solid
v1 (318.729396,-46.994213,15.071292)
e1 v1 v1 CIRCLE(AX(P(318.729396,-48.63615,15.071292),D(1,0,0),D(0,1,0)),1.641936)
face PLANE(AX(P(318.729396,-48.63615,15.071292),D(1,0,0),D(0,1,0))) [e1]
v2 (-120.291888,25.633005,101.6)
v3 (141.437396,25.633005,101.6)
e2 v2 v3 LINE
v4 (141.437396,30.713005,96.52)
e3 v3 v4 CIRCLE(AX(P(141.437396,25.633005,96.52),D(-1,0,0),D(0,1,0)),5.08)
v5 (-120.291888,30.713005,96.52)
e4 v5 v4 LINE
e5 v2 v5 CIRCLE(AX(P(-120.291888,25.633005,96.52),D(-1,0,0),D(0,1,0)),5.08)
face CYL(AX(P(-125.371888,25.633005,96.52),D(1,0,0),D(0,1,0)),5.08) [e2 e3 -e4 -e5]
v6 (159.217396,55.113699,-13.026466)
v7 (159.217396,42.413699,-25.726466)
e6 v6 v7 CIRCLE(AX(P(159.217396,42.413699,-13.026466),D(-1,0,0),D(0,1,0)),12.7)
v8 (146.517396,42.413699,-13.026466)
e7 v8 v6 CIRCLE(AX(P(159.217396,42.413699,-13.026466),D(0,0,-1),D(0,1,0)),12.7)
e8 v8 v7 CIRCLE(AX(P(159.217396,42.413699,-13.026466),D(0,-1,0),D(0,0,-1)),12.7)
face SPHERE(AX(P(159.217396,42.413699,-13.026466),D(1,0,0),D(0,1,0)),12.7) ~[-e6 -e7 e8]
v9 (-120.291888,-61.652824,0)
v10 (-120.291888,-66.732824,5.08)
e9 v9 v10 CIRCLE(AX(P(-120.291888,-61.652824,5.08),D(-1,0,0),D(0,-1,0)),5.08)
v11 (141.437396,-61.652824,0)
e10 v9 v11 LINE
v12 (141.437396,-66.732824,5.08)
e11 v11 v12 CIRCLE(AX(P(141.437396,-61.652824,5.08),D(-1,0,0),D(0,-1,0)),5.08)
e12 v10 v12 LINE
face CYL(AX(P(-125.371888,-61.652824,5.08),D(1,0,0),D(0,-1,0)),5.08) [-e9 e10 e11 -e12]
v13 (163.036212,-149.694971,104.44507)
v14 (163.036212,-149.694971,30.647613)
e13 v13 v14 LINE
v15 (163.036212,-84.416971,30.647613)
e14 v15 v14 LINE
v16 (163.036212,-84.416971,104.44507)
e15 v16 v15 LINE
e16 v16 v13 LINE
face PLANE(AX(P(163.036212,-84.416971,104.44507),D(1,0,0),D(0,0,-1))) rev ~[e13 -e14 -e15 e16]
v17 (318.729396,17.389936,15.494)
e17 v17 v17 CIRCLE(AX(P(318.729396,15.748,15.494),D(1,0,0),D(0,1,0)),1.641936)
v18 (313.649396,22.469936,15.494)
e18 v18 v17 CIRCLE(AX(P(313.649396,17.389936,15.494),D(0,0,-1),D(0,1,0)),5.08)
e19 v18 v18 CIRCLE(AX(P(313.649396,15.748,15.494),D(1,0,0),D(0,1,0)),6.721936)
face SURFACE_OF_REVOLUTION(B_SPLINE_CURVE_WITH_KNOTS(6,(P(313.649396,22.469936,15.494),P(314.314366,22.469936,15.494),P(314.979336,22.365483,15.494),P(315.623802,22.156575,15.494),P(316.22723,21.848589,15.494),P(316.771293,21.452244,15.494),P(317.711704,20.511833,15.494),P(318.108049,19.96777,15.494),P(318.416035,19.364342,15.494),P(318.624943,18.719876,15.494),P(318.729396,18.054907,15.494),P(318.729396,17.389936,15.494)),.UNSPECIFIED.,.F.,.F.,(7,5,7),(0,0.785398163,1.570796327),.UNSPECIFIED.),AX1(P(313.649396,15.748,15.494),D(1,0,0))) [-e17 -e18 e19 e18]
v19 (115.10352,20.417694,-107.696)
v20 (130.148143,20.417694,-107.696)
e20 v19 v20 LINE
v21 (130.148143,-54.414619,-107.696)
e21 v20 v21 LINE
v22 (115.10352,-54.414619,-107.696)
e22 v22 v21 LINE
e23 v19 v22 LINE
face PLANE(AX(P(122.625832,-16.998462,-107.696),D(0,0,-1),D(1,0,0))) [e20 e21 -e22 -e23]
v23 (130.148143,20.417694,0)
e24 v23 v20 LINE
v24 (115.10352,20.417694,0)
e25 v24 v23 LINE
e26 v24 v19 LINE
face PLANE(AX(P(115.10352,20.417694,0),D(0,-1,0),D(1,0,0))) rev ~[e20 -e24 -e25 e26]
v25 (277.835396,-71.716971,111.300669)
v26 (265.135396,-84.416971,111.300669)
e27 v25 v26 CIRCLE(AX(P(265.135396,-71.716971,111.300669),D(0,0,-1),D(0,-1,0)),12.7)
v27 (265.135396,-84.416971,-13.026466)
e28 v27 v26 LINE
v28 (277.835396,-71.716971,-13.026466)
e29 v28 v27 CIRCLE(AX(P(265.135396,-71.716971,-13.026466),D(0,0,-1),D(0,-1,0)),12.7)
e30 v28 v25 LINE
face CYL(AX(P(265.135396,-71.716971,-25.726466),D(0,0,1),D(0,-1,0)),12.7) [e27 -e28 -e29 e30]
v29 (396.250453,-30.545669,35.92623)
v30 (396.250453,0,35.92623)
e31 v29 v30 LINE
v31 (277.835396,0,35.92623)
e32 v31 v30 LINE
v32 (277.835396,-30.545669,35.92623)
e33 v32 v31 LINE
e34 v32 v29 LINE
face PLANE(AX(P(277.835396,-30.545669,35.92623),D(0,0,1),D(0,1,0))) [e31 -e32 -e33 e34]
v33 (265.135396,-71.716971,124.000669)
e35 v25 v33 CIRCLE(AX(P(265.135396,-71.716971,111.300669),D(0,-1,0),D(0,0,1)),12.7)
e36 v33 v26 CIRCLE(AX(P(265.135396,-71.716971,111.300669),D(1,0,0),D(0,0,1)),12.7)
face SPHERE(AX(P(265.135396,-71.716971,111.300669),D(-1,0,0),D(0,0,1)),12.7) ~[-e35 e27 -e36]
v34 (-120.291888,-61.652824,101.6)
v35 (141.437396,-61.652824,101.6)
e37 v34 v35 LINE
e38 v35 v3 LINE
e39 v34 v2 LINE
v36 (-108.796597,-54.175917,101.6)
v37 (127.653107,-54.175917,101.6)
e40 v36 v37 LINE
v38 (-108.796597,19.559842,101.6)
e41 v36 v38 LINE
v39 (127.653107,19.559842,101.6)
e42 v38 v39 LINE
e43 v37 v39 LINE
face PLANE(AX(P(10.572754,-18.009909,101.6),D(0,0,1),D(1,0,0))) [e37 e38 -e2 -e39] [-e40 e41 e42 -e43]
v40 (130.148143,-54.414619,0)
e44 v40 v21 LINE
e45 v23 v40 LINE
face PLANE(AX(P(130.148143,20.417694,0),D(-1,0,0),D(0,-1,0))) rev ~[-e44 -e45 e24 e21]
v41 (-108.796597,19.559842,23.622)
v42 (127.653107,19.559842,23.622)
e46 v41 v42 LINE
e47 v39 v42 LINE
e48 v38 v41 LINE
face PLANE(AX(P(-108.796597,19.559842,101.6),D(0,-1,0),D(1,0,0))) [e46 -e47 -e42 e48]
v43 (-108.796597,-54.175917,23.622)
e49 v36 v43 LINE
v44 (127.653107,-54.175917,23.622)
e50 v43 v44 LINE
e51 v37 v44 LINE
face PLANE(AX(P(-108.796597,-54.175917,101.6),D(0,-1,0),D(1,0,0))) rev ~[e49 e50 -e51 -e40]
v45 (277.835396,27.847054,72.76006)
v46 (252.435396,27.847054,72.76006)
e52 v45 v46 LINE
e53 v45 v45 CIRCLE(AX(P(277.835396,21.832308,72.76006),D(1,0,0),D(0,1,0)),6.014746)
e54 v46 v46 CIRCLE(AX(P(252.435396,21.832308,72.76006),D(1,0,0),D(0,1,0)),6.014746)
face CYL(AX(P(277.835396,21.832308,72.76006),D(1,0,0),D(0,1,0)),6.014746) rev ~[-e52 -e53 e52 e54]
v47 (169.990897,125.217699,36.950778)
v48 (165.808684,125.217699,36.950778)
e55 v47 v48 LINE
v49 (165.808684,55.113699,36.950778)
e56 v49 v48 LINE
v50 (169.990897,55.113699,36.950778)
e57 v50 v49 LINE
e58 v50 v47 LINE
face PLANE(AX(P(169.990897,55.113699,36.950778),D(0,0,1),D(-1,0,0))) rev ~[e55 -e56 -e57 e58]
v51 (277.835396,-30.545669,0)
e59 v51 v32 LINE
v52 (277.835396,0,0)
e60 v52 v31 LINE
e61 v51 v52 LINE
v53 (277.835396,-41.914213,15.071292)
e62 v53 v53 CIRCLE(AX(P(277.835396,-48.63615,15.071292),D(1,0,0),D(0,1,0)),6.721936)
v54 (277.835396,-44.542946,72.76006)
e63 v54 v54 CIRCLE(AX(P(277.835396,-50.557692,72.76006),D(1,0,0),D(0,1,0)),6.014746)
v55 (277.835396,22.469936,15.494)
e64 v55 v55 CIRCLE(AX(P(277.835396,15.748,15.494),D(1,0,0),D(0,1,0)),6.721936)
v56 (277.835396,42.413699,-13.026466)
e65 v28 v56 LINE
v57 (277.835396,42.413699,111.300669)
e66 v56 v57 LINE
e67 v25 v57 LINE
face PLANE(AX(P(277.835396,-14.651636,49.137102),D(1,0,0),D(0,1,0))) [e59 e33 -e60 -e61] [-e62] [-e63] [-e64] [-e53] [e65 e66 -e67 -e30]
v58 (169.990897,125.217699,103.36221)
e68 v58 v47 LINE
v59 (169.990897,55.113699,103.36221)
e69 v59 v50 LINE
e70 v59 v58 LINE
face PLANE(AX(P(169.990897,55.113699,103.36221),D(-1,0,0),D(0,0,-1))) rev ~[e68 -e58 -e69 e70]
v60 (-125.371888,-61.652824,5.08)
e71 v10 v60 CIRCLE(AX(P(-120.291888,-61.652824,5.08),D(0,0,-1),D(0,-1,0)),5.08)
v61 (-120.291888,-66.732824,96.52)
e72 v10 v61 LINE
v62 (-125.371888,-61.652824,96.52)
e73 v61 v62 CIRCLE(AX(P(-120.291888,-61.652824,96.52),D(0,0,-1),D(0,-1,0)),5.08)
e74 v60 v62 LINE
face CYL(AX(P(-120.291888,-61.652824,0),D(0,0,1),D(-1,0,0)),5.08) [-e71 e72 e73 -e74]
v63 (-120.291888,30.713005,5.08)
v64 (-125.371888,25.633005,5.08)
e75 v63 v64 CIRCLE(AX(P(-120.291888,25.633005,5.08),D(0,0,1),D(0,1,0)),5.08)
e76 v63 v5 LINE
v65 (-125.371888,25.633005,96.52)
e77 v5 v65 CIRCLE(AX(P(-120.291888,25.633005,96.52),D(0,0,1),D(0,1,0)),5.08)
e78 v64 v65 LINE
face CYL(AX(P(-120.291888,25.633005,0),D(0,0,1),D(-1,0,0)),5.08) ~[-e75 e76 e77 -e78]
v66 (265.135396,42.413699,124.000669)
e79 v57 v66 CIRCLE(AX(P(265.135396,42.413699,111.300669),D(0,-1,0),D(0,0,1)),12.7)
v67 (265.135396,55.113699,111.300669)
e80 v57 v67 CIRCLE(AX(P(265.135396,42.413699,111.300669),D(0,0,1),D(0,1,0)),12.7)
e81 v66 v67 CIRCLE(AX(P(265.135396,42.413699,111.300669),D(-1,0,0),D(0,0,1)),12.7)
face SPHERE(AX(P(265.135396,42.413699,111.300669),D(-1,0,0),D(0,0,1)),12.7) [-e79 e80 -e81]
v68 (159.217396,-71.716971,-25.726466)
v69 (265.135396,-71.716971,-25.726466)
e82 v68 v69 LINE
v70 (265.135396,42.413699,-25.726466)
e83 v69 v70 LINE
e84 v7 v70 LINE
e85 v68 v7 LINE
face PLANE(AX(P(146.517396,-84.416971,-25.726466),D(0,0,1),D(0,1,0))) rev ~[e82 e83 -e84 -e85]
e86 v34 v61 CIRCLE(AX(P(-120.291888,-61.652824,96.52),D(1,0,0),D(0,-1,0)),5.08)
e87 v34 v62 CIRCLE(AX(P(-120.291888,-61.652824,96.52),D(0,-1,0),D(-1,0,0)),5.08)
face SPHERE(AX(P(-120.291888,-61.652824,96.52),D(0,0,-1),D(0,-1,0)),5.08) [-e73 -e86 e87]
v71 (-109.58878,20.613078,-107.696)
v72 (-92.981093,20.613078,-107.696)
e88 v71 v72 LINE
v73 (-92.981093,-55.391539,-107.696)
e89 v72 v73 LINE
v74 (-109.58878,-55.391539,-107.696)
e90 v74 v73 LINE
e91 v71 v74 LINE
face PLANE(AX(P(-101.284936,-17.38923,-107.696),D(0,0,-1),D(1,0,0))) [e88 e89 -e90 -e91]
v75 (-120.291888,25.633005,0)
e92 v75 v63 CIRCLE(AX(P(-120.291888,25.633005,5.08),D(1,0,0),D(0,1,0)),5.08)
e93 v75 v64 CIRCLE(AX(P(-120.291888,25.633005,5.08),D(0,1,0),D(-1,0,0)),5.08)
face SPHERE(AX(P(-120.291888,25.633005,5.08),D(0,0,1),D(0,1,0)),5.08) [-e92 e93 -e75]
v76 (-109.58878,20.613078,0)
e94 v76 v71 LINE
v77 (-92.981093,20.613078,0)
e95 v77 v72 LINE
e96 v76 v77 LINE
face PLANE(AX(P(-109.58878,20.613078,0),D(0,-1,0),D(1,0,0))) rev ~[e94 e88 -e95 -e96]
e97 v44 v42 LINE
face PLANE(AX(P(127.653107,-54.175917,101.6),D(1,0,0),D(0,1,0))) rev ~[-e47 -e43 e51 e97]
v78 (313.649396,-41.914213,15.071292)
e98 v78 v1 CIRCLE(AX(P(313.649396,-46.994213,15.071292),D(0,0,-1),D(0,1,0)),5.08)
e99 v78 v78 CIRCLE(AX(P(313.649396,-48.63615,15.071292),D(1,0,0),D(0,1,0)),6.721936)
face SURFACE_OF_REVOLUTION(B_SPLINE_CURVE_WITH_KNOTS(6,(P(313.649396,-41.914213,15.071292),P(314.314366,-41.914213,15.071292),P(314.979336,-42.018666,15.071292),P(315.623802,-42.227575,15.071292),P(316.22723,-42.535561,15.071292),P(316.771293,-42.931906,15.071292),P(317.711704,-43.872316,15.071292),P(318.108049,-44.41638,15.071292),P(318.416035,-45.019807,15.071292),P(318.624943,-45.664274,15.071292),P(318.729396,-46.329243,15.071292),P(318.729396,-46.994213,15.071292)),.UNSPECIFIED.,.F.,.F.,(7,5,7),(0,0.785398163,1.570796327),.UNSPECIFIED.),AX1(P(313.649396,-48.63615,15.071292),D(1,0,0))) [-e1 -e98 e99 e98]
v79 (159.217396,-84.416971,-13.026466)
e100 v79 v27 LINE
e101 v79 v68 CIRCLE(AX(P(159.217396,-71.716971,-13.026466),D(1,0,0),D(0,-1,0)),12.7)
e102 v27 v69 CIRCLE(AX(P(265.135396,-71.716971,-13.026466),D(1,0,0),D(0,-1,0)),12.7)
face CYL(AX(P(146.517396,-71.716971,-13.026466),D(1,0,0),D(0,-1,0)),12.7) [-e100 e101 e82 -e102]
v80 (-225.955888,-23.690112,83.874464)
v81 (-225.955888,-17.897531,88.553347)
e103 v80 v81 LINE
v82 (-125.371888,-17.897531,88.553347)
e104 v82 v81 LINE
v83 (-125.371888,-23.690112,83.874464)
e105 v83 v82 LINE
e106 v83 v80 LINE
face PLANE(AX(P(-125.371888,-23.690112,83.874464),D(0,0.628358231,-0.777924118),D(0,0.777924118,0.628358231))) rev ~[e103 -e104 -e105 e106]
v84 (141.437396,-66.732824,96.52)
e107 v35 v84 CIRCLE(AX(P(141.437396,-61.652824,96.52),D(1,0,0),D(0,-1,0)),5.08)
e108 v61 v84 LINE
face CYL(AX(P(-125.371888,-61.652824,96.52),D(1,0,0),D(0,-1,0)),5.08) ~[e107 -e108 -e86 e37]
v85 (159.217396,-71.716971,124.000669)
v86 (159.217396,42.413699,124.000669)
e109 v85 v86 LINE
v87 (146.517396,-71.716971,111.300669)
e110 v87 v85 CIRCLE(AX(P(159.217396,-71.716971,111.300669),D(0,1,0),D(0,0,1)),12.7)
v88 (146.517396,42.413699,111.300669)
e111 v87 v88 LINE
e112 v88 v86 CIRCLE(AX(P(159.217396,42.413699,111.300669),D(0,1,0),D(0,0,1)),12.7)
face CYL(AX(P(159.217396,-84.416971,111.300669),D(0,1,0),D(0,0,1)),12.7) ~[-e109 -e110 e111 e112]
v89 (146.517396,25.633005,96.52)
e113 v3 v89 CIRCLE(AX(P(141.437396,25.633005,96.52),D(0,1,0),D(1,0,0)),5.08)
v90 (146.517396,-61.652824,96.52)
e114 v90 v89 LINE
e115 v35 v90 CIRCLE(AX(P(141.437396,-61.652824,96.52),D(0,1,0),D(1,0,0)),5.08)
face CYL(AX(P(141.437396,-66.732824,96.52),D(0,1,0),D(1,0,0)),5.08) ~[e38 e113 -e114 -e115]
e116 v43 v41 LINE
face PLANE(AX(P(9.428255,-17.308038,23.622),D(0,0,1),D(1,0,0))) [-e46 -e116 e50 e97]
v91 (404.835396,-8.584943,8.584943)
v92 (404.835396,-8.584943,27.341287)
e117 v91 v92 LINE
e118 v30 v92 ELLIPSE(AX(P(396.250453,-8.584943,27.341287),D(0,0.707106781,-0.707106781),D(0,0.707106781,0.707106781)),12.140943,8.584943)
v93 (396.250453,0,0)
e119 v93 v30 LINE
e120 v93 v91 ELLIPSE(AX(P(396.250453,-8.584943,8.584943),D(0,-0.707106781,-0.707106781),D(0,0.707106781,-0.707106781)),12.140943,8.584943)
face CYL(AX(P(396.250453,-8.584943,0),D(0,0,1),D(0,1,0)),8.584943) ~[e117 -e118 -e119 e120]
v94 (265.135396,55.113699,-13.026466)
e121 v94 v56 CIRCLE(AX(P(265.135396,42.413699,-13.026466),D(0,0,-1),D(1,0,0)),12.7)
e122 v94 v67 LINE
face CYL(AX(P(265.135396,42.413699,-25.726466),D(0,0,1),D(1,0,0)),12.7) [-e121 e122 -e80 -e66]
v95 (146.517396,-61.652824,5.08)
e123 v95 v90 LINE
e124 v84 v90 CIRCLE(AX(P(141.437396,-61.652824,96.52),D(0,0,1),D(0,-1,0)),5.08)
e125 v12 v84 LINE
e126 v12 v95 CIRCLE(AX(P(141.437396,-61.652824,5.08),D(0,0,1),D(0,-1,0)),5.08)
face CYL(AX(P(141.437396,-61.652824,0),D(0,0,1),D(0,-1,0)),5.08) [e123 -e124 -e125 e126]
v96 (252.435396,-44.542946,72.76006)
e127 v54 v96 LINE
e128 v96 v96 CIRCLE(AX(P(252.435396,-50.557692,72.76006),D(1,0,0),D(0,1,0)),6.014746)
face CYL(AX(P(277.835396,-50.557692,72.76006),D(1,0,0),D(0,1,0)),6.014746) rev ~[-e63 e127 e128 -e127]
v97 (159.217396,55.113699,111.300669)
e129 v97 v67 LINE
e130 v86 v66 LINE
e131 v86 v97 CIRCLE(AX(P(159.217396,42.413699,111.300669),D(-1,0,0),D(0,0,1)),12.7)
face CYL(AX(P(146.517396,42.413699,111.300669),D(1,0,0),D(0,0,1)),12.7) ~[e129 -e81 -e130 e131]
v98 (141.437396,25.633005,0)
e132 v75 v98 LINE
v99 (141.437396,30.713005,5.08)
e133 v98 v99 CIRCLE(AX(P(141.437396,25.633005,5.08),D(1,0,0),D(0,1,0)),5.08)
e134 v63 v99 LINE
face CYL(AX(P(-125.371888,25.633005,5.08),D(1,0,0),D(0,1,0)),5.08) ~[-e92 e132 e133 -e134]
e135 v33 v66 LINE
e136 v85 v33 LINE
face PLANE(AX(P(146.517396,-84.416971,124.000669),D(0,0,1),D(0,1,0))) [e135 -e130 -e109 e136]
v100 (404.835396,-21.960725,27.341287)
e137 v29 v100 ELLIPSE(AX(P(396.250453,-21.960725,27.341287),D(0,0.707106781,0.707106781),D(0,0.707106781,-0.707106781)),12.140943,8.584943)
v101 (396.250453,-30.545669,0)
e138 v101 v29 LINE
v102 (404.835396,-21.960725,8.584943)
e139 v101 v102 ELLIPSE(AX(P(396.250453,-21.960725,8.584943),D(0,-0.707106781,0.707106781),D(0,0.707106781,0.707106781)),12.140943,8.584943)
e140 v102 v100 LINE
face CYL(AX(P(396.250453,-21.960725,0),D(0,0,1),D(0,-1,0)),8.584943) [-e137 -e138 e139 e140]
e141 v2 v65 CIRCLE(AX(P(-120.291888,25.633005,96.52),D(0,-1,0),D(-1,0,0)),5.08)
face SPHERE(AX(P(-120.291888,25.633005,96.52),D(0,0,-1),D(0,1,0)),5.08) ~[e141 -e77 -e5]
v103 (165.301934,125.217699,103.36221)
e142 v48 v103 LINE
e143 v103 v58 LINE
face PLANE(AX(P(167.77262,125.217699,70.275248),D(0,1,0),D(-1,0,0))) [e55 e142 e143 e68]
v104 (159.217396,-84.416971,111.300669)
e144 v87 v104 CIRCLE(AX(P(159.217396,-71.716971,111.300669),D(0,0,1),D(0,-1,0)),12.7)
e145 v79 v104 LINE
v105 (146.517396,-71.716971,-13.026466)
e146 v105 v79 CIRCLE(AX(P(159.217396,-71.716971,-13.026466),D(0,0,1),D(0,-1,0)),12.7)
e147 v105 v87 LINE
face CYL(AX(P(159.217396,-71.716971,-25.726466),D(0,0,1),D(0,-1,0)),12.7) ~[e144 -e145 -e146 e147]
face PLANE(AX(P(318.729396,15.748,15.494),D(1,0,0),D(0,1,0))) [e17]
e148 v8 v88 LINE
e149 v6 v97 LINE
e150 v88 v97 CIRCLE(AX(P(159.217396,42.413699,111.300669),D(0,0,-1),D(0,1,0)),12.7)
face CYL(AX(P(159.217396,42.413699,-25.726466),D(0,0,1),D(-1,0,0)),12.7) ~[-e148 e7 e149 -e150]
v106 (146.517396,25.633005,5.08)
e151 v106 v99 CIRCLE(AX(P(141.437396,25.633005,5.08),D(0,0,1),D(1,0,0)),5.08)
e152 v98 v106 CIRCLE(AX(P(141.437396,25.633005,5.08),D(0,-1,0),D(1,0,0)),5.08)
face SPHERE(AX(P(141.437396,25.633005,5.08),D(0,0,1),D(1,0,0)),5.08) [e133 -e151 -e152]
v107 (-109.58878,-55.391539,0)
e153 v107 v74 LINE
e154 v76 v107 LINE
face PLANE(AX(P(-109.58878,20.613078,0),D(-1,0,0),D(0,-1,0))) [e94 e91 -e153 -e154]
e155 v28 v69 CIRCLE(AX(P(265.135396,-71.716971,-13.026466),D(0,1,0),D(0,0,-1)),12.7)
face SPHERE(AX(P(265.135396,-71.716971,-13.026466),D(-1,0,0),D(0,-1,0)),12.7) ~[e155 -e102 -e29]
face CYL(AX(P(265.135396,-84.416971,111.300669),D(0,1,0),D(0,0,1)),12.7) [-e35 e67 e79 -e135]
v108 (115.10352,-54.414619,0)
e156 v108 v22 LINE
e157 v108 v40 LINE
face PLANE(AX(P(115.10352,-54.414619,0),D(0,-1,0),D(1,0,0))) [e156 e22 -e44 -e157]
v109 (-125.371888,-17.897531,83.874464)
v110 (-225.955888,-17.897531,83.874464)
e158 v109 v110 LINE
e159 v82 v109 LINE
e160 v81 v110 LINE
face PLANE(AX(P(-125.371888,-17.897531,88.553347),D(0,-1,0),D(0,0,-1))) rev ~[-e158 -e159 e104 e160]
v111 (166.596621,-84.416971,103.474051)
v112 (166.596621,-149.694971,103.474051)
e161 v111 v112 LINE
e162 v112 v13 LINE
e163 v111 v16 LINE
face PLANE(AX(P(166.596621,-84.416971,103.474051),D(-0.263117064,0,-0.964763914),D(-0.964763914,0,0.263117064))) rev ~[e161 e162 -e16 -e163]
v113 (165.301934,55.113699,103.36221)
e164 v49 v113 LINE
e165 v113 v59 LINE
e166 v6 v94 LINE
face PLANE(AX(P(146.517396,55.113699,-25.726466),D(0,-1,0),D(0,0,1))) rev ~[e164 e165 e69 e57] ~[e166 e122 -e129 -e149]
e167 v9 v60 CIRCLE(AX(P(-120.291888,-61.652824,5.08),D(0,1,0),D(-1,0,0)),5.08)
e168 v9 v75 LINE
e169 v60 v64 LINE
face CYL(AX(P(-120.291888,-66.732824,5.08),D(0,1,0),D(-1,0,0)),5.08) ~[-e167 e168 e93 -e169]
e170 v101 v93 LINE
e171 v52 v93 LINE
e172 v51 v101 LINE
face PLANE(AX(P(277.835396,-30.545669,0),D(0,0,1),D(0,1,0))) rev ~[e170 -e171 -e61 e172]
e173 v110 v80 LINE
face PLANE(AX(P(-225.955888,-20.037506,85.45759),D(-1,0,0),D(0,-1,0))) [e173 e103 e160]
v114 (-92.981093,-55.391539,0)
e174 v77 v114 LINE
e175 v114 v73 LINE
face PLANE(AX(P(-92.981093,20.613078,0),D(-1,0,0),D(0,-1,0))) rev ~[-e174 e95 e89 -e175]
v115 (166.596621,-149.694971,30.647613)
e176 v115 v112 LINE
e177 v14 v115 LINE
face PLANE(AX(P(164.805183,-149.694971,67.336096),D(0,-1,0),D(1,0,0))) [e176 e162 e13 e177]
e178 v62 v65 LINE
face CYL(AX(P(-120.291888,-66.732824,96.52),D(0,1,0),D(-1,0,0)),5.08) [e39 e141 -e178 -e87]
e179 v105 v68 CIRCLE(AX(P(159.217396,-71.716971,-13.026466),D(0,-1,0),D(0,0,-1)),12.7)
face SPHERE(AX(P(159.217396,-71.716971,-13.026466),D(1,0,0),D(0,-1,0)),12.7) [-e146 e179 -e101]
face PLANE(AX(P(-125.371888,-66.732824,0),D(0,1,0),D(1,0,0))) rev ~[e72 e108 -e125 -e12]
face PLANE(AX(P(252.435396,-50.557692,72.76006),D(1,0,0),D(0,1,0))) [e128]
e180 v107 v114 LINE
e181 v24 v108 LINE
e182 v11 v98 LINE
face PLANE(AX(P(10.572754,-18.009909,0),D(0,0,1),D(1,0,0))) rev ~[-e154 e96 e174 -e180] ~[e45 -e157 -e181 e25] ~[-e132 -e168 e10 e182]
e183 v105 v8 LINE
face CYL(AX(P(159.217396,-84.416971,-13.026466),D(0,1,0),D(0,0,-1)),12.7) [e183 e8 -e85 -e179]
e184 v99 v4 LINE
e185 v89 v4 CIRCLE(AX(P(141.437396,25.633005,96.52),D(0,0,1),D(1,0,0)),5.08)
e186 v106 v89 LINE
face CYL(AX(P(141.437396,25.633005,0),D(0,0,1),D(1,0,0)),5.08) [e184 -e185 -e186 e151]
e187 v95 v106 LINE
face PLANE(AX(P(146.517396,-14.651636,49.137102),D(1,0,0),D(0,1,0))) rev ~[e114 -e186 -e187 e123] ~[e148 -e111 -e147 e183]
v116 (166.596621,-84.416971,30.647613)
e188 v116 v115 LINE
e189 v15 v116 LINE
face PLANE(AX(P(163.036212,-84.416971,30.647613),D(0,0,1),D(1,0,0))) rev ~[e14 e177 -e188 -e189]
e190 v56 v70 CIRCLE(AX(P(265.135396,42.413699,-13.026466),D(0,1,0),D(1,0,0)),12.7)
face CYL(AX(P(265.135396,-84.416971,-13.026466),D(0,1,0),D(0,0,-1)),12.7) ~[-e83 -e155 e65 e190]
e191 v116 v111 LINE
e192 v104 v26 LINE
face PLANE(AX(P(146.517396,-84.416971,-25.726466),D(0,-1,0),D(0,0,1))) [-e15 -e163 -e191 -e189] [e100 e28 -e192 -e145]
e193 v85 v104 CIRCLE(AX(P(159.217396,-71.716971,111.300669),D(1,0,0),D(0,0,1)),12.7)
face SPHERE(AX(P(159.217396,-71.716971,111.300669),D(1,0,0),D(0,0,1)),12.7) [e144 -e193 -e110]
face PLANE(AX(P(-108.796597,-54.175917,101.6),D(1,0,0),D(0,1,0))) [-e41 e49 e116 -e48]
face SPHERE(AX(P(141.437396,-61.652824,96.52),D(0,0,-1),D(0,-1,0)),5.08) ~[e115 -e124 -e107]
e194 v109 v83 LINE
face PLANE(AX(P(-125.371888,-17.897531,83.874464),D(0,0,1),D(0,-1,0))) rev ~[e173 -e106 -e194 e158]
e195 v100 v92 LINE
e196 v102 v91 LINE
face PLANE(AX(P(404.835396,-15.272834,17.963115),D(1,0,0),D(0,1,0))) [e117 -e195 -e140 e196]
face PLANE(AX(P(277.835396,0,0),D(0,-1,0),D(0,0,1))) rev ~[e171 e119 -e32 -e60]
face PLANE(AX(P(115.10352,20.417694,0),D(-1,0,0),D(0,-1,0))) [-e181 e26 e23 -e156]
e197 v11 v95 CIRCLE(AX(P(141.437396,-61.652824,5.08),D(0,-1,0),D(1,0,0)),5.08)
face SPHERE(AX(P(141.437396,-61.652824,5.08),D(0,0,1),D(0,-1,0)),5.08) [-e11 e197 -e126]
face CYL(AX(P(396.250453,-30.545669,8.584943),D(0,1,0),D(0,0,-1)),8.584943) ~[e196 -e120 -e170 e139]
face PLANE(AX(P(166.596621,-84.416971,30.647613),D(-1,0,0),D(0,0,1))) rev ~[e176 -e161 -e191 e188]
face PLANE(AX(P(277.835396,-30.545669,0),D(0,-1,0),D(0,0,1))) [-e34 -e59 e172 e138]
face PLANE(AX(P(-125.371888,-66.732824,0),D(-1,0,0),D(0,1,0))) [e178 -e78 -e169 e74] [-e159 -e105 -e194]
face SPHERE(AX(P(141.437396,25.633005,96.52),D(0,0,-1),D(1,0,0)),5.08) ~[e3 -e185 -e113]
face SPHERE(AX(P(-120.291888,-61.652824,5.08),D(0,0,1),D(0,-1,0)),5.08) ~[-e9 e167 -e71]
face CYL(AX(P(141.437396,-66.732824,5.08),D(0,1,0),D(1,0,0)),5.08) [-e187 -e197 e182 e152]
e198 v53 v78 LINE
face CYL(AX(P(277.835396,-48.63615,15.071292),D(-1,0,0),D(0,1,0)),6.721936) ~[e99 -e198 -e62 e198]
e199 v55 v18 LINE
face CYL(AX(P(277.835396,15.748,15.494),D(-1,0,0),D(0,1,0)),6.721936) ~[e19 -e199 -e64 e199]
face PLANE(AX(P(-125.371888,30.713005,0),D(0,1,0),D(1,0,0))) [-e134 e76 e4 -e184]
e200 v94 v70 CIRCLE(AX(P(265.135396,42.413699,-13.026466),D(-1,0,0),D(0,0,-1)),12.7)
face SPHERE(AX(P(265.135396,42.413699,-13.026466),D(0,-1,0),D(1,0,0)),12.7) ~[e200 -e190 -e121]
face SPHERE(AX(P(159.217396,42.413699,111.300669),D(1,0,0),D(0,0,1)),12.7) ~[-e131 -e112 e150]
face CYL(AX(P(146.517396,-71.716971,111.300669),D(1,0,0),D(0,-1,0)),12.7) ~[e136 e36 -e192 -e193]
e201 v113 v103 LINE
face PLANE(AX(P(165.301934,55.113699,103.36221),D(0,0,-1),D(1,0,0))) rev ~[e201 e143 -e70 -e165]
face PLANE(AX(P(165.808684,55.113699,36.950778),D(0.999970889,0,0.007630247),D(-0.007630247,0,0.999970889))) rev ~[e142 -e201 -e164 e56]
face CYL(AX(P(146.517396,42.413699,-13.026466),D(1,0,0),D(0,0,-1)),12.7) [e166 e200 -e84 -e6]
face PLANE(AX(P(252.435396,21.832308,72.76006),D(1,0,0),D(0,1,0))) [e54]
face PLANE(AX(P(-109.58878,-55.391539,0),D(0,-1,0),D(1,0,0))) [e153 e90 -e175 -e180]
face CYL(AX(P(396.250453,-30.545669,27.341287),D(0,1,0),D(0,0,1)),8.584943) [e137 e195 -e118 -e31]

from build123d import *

# Parameters (mm, degrees)
F0_W      = 271.8892842531
F0_H      = 97.4458288401
F1_DEPTH  = 101.6
F3_R      = 5.08
F4_W      = 16.6076868773
F4_H      = 76.0046169162
F5_DEPTH  = 107.696
F6_W      = 15.0446221232
F6_H      = 74.8323127627
F7_DEPTH  = 107.696
F2_W      = 236.4497035742
F2_H      = 73.7357586622
F8_DEPTH  = 77.978
F9_W      = 139.5306698978
F9_H      = 149.727134034
F10_DEPTH = 131.318
F11_R     = 12.7
F12_W     = 30.5456686765
F12_H     = 35.9262302518
F13_DEPTH = 127
F15_DEPTH = 65.278
F17_DEPTH = 70.104
F18_R     = 6.7219361341
F19_DEPTH = 40.894
F21_DEPTH = 100.584
F22_R     = 6.0147460443
F23_DEPTH = 25.4
F24_R     = 5.08
F25_R     = 8.5849434278


with BuildPart() as f1:
    # F0 (on Top) → F1 (new body)
    with BuildSketch(Plane.XY):
        with Locations((10.5727538466, -18.0099094287)):
            Rectangle(F0_W, F0_H)
    extrude(amount=F1_DEPTH)

    # F3
    f3_edges = [f1.edges().sort_by_distance(p)[0] for p in [
        (-125.371888, -66.732824, 50.8),
        (146.517396, -66.732824, 50.8),
        (10.572754, -66.732824, 0),
        (10.572754, -66.732824, 101.6),
        (146.517396, 30.713005, 50.8),
        (146.517396, -18.009909, 0),
        (146.517396, -18.009909, 101.6),
        (-125.371888, 30.713005, 50.8),
        (10.572754, 30.713005, 0),
        (10.572754, 30.713005, 101.6),
        (-125.371888, -18.009909, 0),
        (-125.371888, -18.009909, 101.6),
    ]]
    fillet(f3_edges, radius=F3_R)

    # F4 (on face) → F5 (join)
    with BuildSketch(Plane(origin=(0, 0, 0), x_dir=(1, 0, 0), z_dir=(0, 0, -1))):
        with Locations((-101.2849360704, 17.3892304301)):
            Rectangle(F4_W, F4_H)
    extrude(amount=F5_DEPTH)

    # F6 (on face) → F7 (join)
    with BuildSketch(Plane(origin=(0, 0, 0), x_dir=(1, 0, 0), z_dir=(0, 0, -1))):
        with Locations((122.6258315146, 16.998462379)):
            Rectangle(F6_W, F6_H)
    extrude(amount=F7_DEPTH)

    # F2 (on face) → F8 (cut)
    with BuildSketch(Plane.XY.offset(101.6)):
        with Locations((9.42825526, -17.3080377281)):
            Rectangle(F2_W, F2_H)
    extrude(amount=-F8_DEPTH, mode=Mode.SUBTRACT)

    # F9 (on face) → F10 (join)
    with BuildSketch(Plane.YZ.offset(146.5173959732)):
        with Locations((-14.6516356617, 49.1371015087)):
            Rectangle(F9_W, F9_H)
    extrude(amount=F10_DEPTH)

    # F11
    f11_edges = [f1.edges().sort_by_distance(p)[0] for p in [
        (212.176396, 55.113699, 124.000669),
        (212.176396, -84.416971, 124.000669),
        (146.517396, -14.651636, 124.000669),
        (277.835396, -14.651636, 124.000669),
        (212.176396, -84.416971, -25.726466),
        (146.517396, -84.416971, 49.137102),
        (277.835396, -84.416971, 49.137102),
        (277.835396, -14.651636, -25.726466),
        (277.835396, 55.113699, 49.137102),
        (212.176396, 55.113699, -25.726466),
        (146.517396, 55.113699, 49.137102),
        (146.517396, -14.651636, -25.726466),
    ]]
    fillet(f11_edges, radius=F11_R)

    # F12 (on face) → F13 (join)
    with BuildSketch(Plane.YZ.offset(277.8353959732)):
        with Locations((-15.2728343382, 17.9631151259)):
            Rectangle(F12_W, F12_H)
    extrude(amount=F13_DEPTH)

    # F14 (on face) → F15 (join)
    with BuildSketch(Plane.XZ.offset(84.4169706106)):
        Polygon((166.5966212749, 103.4740507603), (163.0362123251, 104.4450700283), (163.0362123251, 30.6476131082), (166.5966212749, 30.6476131082), align=None)
    extrude(amount=F15_DEPTH)

    # F16 (on face) → F17 (join)
    with BuildSketch(Plane(origin=(0, 55.1136992872, 0), x_dir=(-1, 0, 0), z_dir=(0, 1, 0))):
        Polygon((-165.8086842582, 36.9507782161), (-165.3019338846, 103.3622100949), (-169.9908971786, 103.3622100949), (-169.9908971786, 36.9507782161), align=None)
    extrude(amount=F17_DEPTH)

    # F18 (on face) → F19 (join)
    with BuildSketch(Plane.YZ.offset(277.8353959732)):
        with Locations((-48.636149615, 15.0712924078)):
            Circle(F18_R)
        with Locations((15.748, 15.494)):
            Circle(F18_R)
    extrude(amount=F19_DEPTH)

    # F20 (on face) → F21 (join)
    with BuildSketch(Plane(origin=(-125.3718882799, 0, 0), x_dir=(0, -1, 0), z_dir=(-1, 0, 0))):
        Polygon((23.6901119351, 83.874464035), (17.8975313902, 88.5533466935), (17.8975313902, 83.874464035), align=None)
    extrude(amount=F21_DEPTH)

    # F22 (on face) → F23 (cut)
    with BuildSketch(Plane.YZ.offset(277.8353959732)):
        with Locations((-50.5576916039, 72.7600604296)):
            Circle(F22_R)
        with Locations((21.8323083961, 72.7600604296)):
            Circle(F22_R)
    extrude(amount=-F23_DEPTH, mode=Mode.SUBTRACT)

    # F24
    f24_edges = [f1.edges().sort_by_distance(p)[0] for p in [
        (318.729396, -55.358086, 15.071292),
        (318.729396, 9.026064, 15.494),
    ]]
    fillet(f24_edges, radius=F24_R)

    # F25
    f25_edges = [f1.edges().sort_by_distance(p)[0] for p in [
        (404.835396, -15.272834, 35.92623),
        (404.835396, -30.545669, 17.963115),
        (404.835396, -15.272834, 0),
        (404.835396, 0, 17.963115),
    ]]
    fillet(f25_edges, radius=F25_R)


solid = f1.part
